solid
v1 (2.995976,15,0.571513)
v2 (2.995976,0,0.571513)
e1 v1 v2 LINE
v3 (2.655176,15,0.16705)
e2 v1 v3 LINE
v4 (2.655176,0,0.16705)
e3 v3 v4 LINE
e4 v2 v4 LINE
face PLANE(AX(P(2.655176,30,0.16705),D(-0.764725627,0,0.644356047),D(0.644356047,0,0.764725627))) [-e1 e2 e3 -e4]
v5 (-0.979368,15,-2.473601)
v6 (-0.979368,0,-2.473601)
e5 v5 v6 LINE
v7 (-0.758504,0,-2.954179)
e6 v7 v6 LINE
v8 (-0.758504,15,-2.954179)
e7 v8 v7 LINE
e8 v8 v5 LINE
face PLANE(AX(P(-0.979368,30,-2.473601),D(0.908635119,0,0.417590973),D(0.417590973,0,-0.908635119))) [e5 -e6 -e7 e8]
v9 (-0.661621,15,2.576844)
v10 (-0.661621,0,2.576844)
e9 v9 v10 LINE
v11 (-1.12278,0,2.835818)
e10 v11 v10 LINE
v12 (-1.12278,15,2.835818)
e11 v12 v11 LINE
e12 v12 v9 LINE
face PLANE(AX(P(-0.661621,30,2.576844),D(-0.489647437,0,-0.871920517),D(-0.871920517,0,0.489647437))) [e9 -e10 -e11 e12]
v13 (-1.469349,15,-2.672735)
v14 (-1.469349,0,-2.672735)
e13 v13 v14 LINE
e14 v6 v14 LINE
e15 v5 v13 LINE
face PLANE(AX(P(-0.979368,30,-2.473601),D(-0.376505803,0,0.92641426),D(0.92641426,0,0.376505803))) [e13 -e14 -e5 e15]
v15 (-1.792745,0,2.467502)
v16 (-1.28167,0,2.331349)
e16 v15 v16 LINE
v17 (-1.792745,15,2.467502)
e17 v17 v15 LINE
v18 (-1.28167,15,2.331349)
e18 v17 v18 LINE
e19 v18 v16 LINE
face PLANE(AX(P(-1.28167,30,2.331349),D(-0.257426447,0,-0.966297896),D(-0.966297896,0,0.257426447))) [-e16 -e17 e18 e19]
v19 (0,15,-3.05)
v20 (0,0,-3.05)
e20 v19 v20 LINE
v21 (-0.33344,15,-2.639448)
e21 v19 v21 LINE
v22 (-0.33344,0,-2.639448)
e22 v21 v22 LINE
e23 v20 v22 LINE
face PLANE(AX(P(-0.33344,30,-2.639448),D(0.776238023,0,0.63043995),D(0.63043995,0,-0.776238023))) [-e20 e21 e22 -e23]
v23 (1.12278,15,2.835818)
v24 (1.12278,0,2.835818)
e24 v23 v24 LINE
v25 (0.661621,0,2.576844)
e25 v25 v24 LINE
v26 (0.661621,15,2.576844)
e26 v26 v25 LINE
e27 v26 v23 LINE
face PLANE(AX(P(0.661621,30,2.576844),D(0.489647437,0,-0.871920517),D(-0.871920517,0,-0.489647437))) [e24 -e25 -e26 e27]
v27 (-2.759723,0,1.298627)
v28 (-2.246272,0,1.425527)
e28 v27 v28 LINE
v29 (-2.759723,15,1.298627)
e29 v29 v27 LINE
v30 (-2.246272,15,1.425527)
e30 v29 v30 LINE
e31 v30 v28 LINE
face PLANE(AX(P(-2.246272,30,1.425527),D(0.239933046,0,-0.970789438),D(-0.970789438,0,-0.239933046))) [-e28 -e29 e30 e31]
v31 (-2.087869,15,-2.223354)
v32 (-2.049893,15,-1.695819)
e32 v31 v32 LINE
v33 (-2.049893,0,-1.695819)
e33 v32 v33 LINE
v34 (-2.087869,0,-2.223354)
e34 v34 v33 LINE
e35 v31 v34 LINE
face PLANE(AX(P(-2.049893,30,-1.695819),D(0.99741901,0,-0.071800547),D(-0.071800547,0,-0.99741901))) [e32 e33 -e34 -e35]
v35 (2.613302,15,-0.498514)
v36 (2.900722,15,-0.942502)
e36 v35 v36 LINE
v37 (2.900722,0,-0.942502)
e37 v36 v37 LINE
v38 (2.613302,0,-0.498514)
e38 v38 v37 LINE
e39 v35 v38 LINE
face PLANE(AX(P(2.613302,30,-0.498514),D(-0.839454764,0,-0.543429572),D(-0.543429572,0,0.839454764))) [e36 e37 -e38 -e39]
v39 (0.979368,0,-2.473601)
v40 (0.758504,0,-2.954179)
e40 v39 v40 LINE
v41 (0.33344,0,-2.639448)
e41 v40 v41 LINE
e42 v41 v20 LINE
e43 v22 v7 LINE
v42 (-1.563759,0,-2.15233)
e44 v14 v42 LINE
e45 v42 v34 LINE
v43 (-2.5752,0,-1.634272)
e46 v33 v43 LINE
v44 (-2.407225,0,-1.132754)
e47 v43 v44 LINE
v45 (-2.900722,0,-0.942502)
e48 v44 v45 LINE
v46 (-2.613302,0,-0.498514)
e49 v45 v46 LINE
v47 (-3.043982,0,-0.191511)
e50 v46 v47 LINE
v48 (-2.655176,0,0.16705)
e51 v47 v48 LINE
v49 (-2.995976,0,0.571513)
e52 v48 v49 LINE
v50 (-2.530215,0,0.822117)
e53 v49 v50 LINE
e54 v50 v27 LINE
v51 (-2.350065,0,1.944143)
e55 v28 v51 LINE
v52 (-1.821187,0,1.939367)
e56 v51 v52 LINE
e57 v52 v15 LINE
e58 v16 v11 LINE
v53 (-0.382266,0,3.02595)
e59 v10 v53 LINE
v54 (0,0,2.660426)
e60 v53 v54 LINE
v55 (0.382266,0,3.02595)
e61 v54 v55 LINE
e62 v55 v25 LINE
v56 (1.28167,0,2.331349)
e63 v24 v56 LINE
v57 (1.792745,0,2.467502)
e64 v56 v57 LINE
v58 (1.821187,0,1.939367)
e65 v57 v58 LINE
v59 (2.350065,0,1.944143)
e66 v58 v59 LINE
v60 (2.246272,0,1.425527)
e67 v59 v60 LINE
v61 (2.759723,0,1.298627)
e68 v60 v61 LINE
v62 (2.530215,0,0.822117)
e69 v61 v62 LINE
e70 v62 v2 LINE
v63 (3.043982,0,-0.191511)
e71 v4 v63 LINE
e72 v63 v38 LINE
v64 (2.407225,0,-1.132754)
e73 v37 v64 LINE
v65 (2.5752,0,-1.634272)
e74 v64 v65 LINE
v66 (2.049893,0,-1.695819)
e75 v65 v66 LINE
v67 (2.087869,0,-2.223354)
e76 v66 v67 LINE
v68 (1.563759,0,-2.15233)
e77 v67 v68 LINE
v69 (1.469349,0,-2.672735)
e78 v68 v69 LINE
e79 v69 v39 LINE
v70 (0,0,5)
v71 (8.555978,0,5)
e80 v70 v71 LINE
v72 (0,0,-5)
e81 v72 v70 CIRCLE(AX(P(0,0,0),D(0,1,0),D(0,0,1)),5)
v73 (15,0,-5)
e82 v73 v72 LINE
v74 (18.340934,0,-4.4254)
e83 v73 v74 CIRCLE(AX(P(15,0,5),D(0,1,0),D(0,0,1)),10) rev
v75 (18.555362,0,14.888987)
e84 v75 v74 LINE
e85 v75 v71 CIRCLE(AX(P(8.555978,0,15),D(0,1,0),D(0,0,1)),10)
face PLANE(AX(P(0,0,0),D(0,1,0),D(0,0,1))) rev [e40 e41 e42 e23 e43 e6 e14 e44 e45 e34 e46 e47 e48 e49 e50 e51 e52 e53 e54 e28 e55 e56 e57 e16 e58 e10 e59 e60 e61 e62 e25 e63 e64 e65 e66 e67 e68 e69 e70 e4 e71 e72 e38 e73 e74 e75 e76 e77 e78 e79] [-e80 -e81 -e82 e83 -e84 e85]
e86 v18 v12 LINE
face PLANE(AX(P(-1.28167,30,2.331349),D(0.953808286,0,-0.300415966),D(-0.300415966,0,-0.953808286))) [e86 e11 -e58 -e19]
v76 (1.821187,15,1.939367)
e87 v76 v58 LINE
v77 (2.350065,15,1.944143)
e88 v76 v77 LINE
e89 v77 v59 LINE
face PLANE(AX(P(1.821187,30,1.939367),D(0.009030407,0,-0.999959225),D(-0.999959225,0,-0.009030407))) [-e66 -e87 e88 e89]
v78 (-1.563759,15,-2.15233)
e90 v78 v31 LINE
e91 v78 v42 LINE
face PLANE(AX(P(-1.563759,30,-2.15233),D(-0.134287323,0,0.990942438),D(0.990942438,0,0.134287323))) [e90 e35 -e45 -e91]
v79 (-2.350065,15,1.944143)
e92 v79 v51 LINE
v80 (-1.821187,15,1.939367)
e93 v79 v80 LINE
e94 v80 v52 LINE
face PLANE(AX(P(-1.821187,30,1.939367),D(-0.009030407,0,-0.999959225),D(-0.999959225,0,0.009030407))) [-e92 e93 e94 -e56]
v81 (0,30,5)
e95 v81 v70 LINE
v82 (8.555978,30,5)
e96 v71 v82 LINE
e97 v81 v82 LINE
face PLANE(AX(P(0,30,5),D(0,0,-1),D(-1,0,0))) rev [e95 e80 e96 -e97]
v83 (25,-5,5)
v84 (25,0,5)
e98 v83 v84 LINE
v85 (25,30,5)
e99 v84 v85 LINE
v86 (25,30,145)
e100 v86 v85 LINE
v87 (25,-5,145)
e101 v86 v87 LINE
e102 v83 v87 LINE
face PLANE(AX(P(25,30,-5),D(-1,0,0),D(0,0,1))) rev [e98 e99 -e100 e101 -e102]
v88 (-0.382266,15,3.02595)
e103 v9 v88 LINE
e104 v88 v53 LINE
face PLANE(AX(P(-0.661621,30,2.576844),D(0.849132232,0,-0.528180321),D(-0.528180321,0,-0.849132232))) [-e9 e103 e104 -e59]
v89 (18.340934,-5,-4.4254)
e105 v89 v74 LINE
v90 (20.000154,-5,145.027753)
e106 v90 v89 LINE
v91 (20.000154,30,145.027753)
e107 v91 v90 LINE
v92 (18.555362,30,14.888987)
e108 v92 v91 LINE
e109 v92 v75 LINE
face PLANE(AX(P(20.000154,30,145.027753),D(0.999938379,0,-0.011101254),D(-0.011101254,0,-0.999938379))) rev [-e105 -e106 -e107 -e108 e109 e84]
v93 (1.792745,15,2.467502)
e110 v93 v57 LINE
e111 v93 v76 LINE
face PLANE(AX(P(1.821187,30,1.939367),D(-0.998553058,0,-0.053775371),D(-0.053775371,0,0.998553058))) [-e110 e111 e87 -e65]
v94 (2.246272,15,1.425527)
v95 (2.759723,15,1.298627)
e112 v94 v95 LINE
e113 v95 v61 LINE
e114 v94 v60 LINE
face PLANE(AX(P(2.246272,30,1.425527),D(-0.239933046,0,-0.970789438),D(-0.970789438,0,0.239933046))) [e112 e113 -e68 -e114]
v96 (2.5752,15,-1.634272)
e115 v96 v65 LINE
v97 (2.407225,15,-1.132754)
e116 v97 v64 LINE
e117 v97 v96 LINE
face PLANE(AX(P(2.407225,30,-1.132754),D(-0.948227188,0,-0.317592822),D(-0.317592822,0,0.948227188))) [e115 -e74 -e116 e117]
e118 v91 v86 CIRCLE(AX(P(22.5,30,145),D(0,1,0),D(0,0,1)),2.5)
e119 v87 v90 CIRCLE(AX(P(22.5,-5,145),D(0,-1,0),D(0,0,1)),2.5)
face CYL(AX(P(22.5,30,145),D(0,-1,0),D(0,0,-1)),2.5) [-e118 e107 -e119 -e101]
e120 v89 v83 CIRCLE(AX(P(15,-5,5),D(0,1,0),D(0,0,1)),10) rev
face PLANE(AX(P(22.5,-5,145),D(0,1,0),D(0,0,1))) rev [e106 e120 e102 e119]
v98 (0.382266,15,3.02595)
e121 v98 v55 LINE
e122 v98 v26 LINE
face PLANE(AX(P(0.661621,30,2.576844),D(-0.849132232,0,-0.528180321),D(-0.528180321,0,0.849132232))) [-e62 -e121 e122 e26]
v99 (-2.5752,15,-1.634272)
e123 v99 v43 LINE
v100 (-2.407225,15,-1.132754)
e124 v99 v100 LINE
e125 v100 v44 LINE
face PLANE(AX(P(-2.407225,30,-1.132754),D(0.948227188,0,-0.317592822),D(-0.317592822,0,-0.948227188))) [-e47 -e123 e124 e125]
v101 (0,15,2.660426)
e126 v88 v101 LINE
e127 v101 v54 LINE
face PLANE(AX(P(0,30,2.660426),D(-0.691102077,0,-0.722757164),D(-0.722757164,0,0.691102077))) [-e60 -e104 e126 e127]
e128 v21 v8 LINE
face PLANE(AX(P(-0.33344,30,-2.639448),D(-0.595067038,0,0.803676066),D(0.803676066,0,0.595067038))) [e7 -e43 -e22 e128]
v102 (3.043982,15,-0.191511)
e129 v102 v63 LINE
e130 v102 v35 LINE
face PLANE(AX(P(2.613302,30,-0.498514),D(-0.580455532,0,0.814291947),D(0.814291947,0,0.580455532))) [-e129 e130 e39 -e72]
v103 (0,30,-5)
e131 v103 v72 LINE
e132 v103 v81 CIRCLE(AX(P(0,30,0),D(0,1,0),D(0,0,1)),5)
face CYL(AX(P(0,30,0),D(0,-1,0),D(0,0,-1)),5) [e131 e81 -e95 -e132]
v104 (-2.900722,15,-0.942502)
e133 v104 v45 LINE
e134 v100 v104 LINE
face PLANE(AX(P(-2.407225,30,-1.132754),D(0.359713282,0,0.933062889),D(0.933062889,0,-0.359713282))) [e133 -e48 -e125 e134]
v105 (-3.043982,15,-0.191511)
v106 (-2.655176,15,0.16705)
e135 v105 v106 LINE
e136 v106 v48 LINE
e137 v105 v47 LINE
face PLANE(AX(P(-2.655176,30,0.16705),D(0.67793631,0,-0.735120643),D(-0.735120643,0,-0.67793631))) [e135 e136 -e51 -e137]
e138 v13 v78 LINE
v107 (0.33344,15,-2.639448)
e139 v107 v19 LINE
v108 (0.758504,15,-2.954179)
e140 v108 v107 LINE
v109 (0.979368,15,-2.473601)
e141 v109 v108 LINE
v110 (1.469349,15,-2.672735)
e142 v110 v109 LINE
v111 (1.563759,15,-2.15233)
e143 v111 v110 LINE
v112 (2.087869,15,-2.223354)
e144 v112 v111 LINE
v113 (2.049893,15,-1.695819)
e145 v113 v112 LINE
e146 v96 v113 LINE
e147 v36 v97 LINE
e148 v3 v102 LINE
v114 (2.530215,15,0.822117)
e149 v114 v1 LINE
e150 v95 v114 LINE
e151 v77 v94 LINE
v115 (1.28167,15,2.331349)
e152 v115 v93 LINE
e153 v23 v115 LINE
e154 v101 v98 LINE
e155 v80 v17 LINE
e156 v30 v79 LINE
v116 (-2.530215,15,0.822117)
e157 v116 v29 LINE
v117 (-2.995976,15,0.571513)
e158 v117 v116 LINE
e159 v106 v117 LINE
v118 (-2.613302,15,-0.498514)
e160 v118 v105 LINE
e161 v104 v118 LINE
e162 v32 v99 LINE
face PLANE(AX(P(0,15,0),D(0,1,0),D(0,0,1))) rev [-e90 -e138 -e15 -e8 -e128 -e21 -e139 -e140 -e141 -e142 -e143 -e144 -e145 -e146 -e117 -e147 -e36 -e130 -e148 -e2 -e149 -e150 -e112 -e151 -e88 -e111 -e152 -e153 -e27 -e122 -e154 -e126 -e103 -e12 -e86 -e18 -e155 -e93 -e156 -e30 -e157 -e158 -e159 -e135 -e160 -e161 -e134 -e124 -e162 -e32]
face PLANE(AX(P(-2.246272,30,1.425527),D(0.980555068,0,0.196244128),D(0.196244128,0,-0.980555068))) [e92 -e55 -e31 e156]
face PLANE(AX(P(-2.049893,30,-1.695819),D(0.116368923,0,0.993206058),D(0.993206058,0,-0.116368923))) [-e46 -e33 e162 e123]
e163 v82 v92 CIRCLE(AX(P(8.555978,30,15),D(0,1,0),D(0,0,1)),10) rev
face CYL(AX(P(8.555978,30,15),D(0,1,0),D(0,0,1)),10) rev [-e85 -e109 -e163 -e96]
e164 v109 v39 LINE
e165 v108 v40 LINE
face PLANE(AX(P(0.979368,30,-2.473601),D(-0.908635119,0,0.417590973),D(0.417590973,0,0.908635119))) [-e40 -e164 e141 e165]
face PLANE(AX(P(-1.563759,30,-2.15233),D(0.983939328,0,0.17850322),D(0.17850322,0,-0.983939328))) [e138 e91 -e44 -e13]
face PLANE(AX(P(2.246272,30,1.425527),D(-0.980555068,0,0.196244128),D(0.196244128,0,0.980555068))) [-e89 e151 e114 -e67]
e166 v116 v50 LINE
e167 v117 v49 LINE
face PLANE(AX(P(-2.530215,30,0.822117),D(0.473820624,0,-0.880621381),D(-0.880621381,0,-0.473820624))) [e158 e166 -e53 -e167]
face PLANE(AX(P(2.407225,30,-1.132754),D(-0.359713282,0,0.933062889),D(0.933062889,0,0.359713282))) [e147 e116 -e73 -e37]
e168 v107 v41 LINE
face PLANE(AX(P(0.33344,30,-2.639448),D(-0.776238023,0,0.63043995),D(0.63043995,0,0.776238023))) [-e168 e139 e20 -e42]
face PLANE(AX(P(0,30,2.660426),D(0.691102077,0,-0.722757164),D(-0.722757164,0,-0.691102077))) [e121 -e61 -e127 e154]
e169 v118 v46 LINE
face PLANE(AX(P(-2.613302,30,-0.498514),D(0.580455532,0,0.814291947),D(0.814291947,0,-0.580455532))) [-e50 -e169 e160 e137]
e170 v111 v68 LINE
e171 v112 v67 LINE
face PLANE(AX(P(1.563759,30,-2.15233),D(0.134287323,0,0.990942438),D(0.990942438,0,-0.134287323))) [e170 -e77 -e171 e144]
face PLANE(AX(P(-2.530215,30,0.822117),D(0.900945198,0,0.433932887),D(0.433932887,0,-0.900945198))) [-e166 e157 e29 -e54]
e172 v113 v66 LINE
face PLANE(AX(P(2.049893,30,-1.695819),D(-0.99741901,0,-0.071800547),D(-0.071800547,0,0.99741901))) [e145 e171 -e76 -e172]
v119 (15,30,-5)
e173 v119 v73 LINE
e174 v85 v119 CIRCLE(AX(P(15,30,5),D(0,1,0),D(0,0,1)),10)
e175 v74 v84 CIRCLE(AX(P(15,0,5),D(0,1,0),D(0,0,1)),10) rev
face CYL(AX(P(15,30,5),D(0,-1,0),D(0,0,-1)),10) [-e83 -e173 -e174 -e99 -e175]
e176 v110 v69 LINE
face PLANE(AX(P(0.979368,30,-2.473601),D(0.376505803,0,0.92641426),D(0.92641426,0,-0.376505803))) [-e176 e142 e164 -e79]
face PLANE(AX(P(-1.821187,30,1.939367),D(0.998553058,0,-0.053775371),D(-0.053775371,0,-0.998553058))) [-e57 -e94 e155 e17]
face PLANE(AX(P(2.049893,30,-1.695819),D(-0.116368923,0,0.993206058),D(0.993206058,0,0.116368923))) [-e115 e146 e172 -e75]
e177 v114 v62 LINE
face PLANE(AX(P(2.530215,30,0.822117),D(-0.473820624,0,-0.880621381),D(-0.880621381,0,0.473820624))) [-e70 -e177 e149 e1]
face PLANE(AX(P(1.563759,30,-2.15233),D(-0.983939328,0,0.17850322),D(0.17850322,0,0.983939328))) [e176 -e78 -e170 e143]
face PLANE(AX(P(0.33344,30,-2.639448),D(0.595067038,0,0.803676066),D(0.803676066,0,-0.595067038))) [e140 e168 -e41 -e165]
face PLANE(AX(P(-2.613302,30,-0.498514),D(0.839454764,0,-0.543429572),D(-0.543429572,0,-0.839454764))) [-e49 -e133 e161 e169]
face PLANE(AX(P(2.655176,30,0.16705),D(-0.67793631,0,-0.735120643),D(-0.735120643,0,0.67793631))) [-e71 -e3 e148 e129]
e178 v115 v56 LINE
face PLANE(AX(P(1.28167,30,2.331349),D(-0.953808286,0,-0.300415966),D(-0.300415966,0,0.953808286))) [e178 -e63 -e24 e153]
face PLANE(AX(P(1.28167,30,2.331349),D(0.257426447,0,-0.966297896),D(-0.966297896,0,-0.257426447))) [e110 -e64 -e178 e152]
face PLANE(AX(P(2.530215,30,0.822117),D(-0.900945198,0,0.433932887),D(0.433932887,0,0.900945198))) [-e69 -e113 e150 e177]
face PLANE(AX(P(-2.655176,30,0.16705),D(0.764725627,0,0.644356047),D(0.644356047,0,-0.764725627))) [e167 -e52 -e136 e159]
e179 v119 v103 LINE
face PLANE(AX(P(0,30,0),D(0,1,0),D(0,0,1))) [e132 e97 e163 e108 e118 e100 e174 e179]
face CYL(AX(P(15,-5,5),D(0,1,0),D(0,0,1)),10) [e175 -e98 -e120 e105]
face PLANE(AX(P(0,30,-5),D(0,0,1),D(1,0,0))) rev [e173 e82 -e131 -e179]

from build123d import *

# Parameters (mm, degrees)
BOSS_EXTRUDE2_DEPTH = 30
FILLET1_R           = 10
FILLET2_R           = 10
SKETCH2_R           = 3.747343823
BOSS_EXTRUDE3_DEPTH = 15
BOSS_EXTRUDE4_START = 5
BOSS_EXTRUDE4_DEPTH = 5
FILLET3_R           = 10


with BuildPart() as part:
    # Sketch1 → Boss-Extrude2 (new body)
    with BuildSketch(Plane(origin=(0, 0, 0), x_dir=(1, 0, 0), z_dir=(0, 1, 0))):
        with BuildLine():
            Line((0, 5), (25, 5))
            Line((25, 5), (25, -145))
            ThreePointArc((25, -145), (22.513876781, -147.499961487), (20.000154052, -145.027753135))
            Line((20.000154052, -145.027753135), (18.445574612, -5))
            Line((18.445574612, -5), (0, -5))
            ThreePointArc((0, -5), (-5, 0), (0, 5))
        make_face()
        Polygon((0.333439775, 2.639447604), (0, 3.05), (-0.333439775, 2.639447604), (-0.758504156, 2.954178641), (-0.979368078, 2.473601404), (-1.469348706, 2.672735374), (-1.563759083, 2.15232973), (-2.087868673, 2.223354314), (-2.049893354, 1.695819264), (-2.575200173, 1.634271725), (-2.407225286, 1.132754236), (-2.900722375, 0.942501833), (-2.6133024, 0.498514094), (-3.043981522, 0.191511085), (-2.655176114, -0.167049522), (-2.995976115, -0.571513009), (-2.530215347, -0.822116802), (-2.75972251, -1.298626839), (-2.246271844, -1.42552746), (-2.35006539, -1.944143169), (-1.821186821, -1.939366985), (-1.792745019, -2.467501833), (-1.281669931, -2.33134895), (-1.122779886, -2.835818282), (-0.661621006, -2.576843686), (-0.382266362, -3.025949839), (0, -2.660425857), (0.382266362, -3.025949839), (0.661621006, -2.576843686), (1.122779886, -2.835818282), (1.281669931, -2.33134895), (1.792745019, -2.467501833), (1.821186821, -1.939366985), (2.35006539, -1.944143169), (2.246271844, -1.42552746), (2.75972251, -1.298626839), (2.530215347, -0.822116802), (2.995976115, -0.571513009), (2.655176114, -0.167049522), (3.043981522, 0.191511085), (2.6133024, 0.498514094), (2.900722375, 0.942501833), (2.407225286, 1.132754236), (2.575200173, 1.634271725), (2.049893354, 1.695819264), (2.087868673, 2.223354314), (1.563759083, 2.15232973), (1.469348706, 2.672735374), (0.979368078, 2.473601404), (0.758504156, 2.954178641), align=None, mode=Mode.SUBTRACT)
    extrude(amount=BOSS_EXTRUDE2_DEPTH)

    # Fillet1
    fillet1_edges = [part.edges().sort_by_distance(p)[0] for p in [
        (18.445574612, 15, 5),
    ]]
    fillet(fillet1_edges, radius=FILLET1_R)

    # Fillet2
    fillet2_edges = [part.edges().sort_by_distance(p)[0] for p in [
        (25, 15, -5),
    ]]
    fillet(fillet2_edges, radius=FILLET2_R)

    # Sketch2 → Boss-Extrude3 (add)
    with BuildSketch(Plane(origin=(0, 30, 0), x_dir=(1, 0, 0), z_dir=(0, 1, 0))):
        Circle(SKETCH2_R)
    extrude(amount=-BOSS_EXTRUDE3_DEPTH)

    # Sketch3 → Boss-Extrude4 (add)
    with BuildSketch(Plane.XZ.offset(BOSS_EXTRUDE4_START)):
        with BuildLine():
            Line((20.000154052, 145.027753135), (18.34093441, -4.425399581))
            Line((18.34093441, -4.425399581), (25, -4.425399581))
            Line((25, -4.425399581), (25, 145))
            ThreePointArc((25, 145), (22.513876781, 147.499961487), (20.000154052, 145.027753135))
        make_face()
    extrude(amount=-BOSS_EXTRUDE4_DEPTH)

    # Fillet3
    # the kernel refuses this fillet: 10 mm, written as the material it takes off along each edge
    with BuildSketch(Plane(origin=(25, -28.563498953, -4.425399581), x_dir=(0, 0, 1), z_dir=(0, 1, 0))) as fillet3_piece_1:
        with BuildLine():
            CenterArc((9.425399581, -10), FILLET3_R, 90, 70.482580004)
            Line((0, -6.65906559), (-0.188507992, -6.592246902))
            ThreePointArc((-0.188507992, -6.592246902), (-0.2, -3.329532795), (-0.2, 0))
            Line((-0.2, 0), (0, 0.2))
            Line((0, 0.2), (9.425399581, 0.2))
            Line((9.425399581, 0.2), (9.425399581, 0))
        make_face()
    extrude(amount=52.126997906, mode=Mode.SUBTRACT)


solid = part.part
